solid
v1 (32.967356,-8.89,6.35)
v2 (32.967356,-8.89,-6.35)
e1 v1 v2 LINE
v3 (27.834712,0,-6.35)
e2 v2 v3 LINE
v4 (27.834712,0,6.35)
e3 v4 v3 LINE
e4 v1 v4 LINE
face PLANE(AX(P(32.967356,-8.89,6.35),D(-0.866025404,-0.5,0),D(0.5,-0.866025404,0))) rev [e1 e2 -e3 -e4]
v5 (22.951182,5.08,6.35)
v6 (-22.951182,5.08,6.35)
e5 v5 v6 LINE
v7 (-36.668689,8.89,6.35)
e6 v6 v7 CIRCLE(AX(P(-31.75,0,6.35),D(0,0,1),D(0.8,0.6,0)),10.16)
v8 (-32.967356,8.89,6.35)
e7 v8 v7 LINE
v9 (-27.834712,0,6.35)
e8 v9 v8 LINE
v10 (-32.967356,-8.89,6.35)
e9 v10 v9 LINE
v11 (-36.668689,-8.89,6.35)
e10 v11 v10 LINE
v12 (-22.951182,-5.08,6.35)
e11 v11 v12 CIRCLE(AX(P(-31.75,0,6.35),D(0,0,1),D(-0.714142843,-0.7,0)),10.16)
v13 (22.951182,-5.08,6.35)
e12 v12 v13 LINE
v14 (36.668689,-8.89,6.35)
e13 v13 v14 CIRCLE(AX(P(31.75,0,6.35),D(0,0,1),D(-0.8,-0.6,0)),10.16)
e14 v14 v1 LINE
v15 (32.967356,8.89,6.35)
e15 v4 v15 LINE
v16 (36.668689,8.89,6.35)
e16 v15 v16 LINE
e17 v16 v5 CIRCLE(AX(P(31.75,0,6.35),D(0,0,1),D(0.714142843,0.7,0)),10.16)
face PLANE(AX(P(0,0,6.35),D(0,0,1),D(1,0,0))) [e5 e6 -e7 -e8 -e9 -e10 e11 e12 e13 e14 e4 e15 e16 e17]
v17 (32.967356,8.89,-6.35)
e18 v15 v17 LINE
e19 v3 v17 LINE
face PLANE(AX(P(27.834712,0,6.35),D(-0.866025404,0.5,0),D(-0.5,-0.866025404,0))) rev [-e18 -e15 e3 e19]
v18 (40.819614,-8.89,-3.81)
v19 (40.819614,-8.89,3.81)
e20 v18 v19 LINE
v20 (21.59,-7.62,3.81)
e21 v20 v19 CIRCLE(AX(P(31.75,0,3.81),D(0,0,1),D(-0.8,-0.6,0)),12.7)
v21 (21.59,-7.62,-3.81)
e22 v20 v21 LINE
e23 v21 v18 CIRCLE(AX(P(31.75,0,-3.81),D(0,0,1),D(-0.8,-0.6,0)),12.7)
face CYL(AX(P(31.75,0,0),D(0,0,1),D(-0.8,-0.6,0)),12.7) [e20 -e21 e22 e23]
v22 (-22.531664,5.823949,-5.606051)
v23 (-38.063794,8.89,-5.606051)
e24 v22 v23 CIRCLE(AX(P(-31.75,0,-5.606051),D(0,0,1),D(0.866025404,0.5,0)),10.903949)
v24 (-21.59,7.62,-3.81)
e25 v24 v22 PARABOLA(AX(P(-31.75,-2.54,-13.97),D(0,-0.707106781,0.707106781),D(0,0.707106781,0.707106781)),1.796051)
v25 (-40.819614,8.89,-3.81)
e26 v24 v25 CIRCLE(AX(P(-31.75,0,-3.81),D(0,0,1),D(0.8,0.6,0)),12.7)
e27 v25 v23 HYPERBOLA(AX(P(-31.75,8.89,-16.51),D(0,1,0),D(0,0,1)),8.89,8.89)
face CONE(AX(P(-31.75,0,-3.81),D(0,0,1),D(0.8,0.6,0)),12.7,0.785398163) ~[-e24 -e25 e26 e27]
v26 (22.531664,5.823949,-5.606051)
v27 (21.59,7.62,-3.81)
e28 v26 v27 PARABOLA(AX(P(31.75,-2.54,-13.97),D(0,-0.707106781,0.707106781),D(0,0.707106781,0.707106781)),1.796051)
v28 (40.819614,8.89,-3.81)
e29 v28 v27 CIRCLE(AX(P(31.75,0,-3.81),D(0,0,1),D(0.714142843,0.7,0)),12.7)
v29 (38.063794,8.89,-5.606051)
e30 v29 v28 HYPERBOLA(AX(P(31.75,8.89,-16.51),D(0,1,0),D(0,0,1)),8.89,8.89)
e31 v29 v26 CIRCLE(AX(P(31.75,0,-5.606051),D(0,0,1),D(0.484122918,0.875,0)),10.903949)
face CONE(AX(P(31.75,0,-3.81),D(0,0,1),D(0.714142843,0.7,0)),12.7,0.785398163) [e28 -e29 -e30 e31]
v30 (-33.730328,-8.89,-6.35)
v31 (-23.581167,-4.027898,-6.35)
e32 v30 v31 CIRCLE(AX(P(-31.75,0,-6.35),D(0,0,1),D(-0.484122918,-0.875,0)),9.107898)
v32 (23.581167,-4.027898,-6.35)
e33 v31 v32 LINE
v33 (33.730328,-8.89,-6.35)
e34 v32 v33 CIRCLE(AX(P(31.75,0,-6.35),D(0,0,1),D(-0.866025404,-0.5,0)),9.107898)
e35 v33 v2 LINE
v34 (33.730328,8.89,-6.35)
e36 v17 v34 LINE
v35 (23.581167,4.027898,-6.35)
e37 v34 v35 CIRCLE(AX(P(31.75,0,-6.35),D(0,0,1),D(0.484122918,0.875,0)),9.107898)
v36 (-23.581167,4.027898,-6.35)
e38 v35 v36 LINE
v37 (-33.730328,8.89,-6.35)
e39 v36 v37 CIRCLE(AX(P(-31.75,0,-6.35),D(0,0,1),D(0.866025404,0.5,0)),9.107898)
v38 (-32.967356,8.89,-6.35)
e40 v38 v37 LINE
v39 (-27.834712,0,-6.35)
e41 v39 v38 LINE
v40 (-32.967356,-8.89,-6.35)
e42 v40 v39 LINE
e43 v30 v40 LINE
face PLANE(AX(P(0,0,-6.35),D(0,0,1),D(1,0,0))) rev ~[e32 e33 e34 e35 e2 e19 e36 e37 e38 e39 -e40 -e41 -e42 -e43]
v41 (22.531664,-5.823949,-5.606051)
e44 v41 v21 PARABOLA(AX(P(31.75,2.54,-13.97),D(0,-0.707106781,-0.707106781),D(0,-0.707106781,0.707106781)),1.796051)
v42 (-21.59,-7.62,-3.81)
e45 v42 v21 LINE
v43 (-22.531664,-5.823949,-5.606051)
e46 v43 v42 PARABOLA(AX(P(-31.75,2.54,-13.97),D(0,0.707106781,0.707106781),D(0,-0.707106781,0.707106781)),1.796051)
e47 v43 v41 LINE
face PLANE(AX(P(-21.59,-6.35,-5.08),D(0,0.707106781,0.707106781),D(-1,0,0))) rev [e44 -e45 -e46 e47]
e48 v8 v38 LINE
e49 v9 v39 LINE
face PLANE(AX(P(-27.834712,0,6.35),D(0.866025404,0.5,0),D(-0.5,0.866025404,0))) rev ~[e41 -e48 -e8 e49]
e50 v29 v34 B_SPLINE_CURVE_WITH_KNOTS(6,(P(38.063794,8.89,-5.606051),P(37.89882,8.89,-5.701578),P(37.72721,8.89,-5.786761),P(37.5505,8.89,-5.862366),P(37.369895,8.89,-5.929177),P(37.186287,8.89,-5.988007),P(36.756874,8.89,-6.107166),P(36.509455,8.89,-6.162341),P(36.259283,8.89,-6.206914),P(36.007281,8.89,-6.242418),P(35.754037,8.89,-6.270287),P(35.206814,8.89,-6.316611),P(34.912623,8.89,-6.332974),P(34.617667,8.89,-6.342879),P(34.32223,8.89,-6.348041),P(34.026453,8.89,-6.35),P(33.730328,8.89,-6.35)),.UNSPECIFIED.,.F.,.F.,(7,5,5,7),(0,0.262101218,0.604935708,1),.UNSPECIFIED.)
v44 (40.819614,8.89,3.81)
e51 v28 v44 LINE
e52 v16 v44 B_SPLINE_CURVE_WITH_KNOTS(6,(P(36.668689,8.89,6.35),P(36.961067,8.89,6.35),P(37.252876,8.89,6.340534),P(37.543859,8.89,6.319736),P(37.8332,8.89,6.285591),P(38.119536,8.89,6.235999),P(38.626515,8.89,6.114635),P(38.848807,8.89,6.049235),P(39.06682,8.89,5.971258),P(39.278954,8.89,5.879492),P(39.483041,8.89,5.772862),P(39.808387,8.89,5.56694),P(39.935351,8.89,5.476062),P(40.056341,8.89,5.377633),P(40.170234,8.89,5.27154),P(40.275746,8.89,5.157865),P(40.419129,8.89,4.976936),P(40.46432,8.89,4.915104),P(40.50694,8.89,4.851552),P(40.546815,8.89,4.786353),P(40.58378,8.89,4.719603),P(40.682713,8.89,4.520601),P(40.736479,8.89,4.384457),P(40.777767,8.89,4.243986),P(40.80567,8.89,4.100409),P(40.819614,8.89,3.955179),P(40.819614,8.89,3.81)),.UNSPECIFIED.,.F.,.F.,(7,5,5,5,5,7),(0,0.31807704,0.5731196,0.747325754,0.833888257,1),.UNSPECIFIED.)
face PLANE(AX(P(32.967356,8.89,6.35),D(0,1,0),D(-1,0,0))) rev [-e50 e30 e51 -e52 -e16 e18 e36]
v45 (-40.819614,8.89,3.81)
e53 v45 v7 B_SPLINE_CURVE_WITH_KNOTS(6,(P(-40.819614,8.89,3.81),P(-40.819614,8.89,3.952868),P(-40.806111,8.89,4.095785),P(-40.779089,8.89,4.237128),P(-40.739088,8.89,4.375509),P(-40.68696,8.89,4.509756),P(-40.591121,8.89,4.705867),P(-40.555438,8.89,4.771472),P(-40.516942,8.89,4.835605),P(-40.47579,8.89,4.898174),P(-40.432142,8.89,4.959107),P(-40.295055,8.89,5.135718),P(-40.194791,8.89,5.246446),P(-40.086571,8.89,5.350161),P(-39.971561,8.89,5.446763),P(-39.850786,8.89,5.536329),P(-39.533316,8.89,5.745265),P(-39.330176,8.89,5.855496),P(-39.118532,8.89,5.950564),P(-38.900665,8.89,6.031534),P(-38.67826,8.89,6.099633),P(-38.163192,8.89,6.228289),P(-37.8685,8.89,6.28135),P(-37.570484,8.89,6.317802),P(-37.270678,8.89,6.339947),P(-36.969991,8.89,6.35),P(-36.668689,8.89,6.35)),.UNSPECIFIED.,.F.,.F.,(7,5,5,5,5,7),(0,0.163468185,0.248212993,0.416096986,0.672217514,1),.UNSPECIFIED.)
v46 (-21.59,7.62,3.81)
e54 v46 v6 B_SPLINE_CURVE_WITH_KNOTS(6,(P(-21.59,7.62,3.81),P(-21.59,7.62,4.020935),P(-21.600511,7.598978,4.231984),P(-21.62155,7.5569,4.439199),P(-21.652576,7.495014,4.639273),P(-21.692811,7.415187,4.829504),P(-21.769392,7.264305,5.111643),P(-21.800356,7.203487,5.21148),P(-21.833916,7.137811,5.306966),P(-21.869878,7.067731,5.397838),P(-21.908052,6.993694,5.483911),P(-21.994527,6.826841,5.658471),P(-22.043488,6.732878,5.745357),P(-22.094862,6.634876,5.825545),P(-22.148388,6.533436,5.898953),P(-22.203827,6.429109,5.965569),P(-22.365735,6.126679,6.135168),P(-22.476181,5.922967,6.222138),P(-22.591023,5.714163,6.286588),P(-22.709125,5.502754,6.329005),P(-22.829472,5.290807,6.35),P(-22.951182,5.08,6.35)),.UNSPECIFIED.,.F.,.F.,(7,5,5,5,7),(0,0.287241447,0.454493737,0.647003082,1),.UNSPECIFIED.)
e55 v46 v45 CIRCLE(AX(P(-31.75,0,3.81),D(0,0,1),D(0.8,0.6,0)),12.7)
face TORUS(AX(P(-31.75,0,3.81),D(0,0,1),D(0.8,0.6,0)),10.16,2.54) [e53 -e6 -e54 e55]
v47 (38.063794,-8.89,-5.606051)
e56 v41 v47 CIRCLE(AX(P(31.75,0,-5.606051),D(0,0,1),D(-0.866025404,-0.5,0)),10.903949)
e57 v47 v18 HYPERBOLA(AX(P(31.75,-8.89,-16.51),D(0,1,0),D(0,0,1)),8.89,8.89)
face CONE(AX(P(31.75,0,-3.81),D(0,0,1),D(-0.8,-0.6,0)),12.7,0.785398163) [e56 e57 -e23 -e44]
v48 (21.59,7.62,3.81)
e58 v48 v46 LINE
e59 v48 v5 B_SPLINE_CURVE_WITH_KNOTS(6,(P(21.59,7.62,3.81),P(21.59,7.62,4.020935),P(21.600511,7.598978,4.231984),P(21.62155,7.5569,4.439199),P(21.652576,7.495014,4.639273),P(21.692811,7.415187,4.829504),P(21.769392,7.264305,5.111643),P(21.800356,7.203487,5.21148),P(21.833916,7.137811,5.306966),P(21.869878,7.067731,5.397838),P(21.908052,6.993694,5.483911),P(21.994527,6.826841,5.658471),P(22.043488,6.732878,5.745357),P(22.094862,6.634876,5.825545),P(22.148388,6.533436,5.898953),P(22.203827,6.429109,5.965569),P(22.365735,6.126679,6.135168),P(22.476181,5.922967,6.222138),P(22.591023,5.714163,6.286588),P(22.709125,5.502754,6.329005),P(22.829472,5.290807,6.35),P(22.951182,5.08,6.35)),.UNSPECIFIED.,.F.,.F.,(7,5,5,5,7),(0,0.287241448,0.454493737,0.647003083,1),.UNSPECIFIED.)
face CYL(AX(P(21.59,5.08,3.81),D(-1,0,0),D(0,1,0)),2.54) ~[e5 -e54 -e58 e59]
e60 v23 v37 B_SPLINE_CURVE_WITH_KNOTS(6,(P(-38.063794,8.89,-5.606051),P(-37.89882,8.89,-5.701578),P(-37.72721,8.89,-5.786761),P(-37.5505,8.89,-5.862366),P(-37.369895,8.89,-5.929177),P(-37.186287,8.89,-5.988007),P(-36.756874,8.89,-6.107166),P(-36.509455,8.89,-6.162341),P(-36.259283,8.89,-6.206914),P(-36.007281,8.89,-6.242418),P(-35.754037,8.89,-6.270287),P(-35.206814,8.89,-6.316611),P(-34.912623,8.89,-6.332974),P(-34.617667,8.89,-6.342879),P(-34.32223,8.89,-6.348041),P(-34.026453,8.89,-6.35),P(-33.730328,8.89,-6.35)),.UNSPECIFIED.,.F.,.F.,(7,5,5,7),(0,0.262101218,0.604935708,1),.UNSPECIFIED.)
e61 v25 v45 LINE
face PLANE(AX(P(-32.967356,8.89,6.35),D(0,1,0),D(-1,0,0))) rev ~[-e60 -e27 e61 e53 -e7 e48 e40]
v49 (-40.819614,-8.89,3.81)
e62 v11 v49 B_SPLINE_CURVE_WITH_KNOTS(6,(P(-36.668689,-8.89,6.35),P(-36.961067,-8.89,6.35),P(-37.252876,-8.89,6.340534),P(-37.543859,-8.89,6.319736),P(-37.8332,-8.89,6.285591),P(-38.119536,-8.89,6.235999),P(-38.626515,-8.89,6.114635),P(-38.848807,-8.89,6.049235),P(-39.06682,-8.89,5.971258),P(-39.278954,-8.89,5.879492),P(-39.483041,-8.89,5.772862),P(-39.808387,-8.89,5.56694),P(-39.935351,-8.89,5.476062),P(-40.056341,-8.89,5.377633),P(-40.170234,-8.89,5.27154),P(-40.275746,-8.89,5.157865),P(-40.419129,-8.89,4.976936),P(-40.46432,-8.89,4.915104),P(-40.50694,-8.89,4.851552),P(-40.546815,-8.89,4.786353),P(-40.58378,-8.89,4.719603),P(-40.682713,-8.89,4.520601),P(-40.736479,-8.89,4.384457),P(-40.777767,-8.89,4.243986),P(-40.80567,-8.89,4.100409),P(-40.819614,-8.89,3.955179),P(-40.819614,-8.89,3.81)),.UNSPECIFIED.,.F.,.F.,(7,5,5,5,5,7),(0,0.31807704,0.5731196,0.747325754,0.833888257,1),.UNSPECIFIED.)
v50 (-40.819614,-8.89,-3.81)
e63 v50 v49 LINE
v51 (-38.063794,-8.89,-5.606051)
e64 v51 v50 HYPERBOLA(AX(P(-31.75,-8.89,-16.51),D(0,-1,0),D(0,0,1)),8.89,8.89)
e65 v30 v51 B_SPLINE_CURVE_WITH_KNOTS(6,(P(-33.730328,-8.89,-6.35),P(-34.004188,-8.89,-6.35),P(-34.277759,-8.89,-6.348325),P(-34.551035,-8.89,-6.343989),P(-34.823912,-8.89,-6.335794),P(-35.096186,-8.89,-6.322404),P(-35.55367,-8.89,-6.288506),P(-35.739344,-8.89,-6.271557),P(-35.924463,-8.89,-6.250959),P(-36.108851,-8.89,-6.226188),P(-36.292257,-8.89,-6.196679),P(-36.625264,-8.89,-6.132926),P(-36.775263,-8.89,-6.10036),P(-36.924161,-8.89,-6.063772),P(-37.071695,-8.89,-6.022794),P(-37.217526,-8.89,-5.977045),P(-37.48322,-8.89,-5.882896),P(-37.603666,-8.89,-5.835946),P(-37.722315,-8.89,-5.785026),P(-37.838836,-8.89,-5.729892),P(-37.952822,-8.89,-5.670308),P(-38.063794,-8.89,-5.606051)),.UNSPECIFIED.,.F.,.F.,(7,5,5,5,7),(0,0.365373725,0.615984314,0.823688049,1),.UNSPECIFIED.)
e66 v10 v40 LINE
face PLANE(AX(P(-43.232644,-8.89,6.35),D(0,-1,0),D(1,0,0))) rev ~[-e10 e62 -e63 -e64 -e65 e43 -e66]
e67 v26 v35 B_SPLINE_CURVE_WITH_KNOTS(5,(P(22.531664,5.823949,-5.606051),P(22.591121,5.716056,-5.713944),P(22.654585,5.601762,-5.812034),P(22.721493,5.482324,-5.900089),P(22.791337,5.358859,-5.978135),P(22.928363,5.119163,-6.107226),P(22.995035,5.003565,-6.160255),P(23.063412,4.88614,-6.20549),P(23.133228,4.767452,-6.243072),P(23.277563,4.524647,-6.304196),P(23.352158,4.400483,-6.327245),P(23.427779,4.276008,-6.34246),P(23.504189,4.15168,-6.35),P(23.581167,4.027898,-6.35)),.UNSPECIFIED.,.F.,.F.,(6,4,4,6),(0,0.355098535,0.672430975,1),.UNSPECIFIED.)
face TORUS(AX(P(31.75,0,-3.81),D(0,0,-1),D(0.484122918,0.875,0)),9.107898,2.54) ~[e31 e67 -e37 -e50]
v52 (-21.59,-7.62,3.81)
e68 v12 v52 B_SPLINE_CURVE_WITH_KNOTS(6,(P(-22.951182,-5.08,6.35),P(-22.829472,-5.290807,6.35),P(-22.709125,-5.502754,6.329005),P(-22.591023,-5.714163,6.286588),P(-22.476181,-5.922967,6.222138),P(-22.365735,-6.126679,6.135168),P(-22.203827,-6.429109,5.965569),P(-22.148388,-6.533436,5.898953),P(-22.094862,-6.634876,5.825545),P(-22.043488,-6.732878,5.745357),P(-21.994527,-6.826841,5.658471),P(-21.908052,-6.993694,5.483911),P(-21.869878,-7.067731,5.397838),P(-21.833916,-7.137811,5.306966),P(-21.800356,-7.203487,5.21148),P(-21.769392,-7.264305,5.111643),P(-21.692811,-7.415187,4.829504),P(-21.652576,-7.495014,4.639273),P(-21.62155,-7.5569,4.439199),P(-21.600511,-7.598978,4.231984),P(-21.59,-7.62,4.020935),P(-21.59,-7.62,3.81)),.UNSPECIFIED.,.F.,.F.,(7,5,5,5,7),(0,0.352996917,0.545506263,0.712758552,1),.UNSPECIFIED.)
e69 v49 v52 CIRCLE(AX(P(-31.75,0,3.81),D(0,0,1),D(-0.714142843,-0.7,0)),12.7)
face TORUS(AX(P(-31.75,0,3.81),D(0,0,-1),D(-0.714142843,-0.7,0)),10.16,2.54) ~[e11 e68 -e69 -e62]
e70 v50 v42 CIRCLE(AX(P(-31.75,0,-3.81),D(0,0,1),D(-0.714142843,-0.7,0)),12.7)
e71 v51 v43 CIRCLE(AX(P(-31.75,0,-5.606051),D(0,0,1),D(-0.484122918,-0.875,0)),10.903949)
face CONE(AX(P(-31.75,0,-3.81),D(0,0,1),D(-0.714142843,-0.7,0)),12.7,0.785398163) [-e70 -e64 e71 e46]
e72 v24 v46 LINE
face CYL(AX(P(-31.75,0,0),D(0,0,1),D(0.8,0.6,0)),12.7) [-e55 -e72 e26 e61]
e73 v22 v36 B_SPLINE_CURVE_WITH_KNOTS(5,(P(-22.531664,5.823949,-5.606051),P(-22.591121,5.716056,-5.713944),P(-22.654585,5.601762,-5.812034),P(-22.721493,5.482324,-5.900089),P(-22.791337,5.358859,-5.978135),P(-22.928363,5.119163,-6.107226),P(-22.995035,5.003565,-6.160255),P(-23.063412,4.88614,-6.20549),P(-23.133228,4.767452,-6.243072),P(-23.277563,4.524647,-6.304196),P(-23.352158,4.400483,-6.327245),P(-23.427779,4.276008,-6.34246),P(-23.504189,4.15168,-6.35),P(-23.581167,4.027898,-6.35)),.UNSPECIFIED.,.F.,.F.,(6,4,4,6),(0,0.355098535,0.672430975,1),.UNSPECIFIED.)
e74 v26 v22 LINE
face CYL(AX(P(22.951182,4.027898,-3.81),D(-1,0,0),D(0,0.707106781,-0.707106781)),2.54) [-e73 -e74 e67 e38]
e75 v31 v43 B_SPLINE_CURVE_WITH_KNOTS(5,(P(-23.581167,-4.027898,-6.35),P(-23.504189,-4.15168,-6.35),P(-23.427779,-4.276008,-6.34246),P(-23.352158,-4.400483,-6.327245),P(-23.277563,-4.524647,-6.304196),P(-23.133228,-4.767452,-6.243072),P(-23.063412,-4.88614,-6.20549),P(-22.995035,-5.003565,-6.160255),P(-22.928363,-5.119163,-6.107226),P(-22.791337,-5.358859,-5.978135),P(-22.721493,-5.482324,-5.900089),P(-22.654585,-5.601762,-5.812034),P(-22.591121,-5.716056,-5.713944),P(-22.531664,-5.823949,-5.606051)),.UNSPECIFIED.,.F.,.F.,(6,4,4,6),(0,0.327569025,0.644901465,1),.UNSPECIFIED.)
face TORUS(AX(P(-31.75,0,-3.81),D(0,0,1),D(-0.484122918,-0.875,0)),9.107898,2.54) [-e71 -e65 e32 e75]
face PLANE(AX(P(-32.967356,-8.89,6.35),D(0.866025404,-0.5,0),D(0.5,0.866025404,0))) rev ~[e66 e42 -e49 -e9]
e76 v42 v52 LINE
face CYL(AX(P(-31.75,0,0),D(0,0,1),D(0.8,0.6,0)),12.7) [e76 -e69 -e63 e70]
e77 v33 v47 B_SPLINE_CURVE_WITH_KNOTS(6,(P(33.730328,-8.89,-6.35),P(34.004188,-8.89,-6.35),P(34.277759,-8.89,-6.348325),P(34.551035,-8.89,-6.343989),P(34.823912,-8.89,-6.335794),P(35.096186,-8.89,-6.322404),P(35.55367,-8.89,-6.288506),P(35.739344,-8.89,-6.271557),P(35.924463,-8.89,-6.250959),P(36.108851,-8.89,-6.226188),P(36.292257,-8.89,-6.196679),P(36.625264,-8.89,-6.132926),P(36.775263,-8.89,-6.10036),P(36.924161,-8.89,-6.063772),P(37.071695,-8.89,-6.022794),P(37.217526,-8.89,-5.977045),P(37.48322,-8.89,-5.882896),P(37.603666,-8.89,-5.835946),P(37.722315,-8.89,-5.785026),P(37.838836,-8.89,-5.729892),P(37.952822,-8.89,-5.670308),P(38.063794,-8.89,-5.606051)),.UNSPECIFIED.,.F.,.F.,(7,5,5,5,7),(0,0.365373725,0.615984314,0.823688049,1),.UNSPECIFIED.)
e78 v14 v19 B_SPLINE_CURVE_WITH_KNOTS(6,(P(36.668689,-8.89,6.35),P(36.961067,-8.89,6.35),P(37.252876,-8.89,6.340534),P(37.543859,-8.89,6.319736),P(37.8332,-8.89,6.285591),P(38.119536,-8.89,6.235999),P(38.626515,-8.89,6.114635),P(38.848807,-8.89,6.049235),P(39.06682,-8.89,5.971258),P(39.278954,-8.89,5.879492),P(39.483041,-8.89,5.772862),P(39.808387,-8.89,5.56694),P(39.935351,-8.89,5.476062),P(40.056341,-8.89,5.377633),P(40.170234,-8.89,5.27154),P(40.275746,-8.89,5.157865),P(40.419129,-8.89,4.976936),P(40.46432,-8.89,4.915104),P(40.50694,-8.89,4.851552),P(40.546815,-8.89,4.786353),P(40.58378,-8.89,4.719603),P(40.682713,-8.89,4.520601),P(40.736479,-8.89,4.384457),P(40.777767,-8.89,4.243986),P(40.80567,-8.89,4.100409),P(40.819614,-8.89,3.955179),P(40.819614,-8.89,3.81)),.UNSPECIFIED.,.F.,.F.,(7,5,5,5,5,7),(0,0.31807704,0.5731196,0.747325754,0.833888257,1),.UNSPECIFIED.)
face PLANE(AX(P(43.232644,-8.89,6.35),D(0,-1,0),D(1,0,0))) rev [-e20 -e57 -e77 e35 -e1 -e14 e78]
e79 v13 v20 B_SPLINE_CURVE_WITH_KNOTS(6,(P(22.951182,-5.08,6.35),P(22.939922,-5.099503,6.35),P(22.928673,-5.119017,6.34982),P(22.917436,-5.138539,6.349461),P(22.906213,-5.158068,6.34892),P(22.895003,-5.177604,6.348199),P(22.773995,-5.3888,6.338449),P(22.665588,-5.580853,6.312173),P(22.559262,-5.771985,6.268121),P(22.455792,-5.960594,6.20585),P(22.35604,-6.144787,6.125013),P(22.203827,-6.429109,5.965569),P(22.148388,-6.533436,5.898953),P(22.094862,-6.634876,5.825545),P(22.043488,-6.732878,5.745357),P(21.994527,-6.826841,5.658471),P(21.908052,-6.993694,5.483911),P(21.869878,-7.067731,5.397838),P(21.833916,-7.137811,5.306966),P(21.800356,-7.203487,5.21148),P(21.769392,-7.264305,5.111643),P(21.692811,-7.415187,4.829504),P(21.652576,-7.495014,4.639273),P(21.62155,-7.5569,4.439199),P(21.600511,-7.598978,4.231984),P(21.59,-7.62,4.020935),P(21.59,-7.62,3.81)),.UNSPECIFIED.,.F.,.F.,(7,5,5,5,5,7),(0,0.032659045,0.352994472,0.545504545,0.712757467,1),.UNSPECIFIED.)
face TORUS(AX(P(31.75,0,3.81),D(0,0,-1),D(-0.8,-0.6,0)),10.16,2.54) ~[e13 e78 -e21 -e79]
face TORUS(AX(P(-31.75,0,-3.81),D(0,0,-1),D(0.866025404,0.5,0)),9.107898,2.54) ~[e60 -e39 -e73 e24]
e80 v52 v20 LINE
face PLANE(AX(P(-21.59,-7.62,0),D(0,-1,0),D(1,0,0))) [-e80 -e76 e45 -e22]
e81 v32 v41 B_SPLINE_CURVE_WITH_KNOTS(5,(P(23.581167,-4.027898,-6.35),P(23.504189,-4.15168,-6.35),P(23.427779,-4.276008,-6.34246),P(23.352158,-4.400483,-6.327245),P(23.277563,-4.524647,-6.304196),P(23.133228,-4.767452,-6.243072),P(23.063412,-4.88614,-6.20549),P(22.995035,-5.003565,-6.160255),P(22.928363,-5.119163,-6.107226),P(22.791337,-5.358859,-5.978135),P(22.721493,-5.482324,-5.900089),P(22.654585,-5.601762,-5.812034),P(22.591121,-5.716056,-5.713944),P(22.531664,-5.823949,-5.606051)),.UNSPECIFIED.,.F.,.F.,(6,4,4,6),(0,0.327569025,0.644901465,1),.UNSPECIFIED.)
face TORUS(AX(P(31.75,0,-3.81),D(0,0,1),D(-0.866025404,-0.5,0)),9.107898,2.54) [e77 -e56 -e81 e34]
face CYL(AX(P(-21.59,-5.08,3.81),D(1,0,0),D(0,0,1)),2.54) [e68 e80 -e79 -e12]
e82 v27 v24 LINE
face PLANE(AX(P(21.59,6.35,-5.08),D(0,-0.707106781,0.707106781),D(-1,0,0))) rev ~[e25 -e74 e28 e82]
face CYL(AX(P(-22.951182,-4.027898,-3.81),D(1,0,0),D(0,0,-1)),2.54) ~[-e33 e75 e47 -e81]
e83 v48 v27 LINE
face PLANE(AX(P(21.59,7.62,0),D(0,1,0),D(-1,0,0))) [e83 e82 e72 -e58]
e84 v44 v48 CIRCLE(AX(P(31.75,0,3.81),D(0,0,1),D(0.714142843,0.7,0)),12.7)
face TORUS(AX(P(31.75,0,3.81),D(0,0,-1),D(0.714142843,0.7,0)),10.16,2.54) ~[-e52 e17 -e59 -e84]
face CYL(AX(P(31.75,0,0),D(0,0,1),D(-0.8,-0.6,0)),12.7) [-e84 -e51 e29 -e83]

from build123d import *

# Parameters (mm, degrees)
F1_DEPTH = 6.35
F3_DEPTH = 12.701
F6_R     = 2.54
F7_SIZE  = 2.54
F8_R     = 2.54


with BuildPart() as f1:
    # F0 (on Top) → F1 (new body, symmetric)
    with BuildSketch(Plane.XY):
        with BuildLine():
            Line((21.59, 7.62), (-21.59, 7.62))
            ThreePointArc((-21.59, 7.62), (-44.45, 0), (-21.59, -7.62))
            Line((-21.59, -7.62), (21.59, -7.62))
            ThreePointArc((21.59, -7.62), (44.45, 0), (21.59, 7.62))
        make_face()
    extrude(amount=F1_DEPTH, both=True)

    # F4: F3 across plane


with BuildPart() as f3:
    # F2 (on face) → F3 (new body, through all)
    with BuildSketch(Plane.XY.offset(6.35)):
        Polygon((-27.8347122138, 0), (-32.9673561069, 8.89), (-43.2326438931, 8.89), (-48.3652877862, 0), (-43.2326438931, -8.89), (-32.9673561069, -8.89), align=None)
    extrude(amount=-F3_DEPTH)


with BuildPart() as f1_1:
    add(f1.part)
    add(f3.part.mirror(Plane.YZ), mode=Mode.SUBTRACT)

    # F5: cut F3
    add(f3.part, mode=Mode.SUBTRACT)

    # F6
    f6_edges = [f1_1.edges().sort_by_distance(p)[0] for p in [
        (0, -7.62, 6.35),
        (-30.913065, -12.672393, 6.35),
        (-30.913065, 12.672393, 6.35),
        (0, 7.62, 6.35),
        (30.913065, 12.672393, 6.35),
        (30.913065, -12.672393, 6.35),
    ]]
    fillet(f6_edges, radius=F6_R)

    # F7
    f7_edges = [f1_1.edges().sort_by_distance(p)[0] for p in [
        (-30.913065, -12.672393, -6.35),
        (0, -7.62, -6.35),
        (30.913065, -12.672393, -6.35),
        (30.913065, 12.672393, -6.35),
        (0, 7.62, -6.35),
        (-30.913065, 12.672393, -6.35),
    ]]
    chamfer(f7_edges, length=F7_SIZE)

    # F8
    f8_edges = [f1_1.edges().sort_by_distance(p)[0] for p in [
        (-29.031016, -9.789419, -6.35),
        (0, -5.08, -6.35),
        (29.031016, -9.789419, -6.35),
        (29.031016, 9.789419, -6.35),
        (0, 5.08, -6.35),
        (-29.031016, 9.789419, -6.35),
    ]]
    fillet(f8_edges, radius=F8_R)


solid = f1_1.part
